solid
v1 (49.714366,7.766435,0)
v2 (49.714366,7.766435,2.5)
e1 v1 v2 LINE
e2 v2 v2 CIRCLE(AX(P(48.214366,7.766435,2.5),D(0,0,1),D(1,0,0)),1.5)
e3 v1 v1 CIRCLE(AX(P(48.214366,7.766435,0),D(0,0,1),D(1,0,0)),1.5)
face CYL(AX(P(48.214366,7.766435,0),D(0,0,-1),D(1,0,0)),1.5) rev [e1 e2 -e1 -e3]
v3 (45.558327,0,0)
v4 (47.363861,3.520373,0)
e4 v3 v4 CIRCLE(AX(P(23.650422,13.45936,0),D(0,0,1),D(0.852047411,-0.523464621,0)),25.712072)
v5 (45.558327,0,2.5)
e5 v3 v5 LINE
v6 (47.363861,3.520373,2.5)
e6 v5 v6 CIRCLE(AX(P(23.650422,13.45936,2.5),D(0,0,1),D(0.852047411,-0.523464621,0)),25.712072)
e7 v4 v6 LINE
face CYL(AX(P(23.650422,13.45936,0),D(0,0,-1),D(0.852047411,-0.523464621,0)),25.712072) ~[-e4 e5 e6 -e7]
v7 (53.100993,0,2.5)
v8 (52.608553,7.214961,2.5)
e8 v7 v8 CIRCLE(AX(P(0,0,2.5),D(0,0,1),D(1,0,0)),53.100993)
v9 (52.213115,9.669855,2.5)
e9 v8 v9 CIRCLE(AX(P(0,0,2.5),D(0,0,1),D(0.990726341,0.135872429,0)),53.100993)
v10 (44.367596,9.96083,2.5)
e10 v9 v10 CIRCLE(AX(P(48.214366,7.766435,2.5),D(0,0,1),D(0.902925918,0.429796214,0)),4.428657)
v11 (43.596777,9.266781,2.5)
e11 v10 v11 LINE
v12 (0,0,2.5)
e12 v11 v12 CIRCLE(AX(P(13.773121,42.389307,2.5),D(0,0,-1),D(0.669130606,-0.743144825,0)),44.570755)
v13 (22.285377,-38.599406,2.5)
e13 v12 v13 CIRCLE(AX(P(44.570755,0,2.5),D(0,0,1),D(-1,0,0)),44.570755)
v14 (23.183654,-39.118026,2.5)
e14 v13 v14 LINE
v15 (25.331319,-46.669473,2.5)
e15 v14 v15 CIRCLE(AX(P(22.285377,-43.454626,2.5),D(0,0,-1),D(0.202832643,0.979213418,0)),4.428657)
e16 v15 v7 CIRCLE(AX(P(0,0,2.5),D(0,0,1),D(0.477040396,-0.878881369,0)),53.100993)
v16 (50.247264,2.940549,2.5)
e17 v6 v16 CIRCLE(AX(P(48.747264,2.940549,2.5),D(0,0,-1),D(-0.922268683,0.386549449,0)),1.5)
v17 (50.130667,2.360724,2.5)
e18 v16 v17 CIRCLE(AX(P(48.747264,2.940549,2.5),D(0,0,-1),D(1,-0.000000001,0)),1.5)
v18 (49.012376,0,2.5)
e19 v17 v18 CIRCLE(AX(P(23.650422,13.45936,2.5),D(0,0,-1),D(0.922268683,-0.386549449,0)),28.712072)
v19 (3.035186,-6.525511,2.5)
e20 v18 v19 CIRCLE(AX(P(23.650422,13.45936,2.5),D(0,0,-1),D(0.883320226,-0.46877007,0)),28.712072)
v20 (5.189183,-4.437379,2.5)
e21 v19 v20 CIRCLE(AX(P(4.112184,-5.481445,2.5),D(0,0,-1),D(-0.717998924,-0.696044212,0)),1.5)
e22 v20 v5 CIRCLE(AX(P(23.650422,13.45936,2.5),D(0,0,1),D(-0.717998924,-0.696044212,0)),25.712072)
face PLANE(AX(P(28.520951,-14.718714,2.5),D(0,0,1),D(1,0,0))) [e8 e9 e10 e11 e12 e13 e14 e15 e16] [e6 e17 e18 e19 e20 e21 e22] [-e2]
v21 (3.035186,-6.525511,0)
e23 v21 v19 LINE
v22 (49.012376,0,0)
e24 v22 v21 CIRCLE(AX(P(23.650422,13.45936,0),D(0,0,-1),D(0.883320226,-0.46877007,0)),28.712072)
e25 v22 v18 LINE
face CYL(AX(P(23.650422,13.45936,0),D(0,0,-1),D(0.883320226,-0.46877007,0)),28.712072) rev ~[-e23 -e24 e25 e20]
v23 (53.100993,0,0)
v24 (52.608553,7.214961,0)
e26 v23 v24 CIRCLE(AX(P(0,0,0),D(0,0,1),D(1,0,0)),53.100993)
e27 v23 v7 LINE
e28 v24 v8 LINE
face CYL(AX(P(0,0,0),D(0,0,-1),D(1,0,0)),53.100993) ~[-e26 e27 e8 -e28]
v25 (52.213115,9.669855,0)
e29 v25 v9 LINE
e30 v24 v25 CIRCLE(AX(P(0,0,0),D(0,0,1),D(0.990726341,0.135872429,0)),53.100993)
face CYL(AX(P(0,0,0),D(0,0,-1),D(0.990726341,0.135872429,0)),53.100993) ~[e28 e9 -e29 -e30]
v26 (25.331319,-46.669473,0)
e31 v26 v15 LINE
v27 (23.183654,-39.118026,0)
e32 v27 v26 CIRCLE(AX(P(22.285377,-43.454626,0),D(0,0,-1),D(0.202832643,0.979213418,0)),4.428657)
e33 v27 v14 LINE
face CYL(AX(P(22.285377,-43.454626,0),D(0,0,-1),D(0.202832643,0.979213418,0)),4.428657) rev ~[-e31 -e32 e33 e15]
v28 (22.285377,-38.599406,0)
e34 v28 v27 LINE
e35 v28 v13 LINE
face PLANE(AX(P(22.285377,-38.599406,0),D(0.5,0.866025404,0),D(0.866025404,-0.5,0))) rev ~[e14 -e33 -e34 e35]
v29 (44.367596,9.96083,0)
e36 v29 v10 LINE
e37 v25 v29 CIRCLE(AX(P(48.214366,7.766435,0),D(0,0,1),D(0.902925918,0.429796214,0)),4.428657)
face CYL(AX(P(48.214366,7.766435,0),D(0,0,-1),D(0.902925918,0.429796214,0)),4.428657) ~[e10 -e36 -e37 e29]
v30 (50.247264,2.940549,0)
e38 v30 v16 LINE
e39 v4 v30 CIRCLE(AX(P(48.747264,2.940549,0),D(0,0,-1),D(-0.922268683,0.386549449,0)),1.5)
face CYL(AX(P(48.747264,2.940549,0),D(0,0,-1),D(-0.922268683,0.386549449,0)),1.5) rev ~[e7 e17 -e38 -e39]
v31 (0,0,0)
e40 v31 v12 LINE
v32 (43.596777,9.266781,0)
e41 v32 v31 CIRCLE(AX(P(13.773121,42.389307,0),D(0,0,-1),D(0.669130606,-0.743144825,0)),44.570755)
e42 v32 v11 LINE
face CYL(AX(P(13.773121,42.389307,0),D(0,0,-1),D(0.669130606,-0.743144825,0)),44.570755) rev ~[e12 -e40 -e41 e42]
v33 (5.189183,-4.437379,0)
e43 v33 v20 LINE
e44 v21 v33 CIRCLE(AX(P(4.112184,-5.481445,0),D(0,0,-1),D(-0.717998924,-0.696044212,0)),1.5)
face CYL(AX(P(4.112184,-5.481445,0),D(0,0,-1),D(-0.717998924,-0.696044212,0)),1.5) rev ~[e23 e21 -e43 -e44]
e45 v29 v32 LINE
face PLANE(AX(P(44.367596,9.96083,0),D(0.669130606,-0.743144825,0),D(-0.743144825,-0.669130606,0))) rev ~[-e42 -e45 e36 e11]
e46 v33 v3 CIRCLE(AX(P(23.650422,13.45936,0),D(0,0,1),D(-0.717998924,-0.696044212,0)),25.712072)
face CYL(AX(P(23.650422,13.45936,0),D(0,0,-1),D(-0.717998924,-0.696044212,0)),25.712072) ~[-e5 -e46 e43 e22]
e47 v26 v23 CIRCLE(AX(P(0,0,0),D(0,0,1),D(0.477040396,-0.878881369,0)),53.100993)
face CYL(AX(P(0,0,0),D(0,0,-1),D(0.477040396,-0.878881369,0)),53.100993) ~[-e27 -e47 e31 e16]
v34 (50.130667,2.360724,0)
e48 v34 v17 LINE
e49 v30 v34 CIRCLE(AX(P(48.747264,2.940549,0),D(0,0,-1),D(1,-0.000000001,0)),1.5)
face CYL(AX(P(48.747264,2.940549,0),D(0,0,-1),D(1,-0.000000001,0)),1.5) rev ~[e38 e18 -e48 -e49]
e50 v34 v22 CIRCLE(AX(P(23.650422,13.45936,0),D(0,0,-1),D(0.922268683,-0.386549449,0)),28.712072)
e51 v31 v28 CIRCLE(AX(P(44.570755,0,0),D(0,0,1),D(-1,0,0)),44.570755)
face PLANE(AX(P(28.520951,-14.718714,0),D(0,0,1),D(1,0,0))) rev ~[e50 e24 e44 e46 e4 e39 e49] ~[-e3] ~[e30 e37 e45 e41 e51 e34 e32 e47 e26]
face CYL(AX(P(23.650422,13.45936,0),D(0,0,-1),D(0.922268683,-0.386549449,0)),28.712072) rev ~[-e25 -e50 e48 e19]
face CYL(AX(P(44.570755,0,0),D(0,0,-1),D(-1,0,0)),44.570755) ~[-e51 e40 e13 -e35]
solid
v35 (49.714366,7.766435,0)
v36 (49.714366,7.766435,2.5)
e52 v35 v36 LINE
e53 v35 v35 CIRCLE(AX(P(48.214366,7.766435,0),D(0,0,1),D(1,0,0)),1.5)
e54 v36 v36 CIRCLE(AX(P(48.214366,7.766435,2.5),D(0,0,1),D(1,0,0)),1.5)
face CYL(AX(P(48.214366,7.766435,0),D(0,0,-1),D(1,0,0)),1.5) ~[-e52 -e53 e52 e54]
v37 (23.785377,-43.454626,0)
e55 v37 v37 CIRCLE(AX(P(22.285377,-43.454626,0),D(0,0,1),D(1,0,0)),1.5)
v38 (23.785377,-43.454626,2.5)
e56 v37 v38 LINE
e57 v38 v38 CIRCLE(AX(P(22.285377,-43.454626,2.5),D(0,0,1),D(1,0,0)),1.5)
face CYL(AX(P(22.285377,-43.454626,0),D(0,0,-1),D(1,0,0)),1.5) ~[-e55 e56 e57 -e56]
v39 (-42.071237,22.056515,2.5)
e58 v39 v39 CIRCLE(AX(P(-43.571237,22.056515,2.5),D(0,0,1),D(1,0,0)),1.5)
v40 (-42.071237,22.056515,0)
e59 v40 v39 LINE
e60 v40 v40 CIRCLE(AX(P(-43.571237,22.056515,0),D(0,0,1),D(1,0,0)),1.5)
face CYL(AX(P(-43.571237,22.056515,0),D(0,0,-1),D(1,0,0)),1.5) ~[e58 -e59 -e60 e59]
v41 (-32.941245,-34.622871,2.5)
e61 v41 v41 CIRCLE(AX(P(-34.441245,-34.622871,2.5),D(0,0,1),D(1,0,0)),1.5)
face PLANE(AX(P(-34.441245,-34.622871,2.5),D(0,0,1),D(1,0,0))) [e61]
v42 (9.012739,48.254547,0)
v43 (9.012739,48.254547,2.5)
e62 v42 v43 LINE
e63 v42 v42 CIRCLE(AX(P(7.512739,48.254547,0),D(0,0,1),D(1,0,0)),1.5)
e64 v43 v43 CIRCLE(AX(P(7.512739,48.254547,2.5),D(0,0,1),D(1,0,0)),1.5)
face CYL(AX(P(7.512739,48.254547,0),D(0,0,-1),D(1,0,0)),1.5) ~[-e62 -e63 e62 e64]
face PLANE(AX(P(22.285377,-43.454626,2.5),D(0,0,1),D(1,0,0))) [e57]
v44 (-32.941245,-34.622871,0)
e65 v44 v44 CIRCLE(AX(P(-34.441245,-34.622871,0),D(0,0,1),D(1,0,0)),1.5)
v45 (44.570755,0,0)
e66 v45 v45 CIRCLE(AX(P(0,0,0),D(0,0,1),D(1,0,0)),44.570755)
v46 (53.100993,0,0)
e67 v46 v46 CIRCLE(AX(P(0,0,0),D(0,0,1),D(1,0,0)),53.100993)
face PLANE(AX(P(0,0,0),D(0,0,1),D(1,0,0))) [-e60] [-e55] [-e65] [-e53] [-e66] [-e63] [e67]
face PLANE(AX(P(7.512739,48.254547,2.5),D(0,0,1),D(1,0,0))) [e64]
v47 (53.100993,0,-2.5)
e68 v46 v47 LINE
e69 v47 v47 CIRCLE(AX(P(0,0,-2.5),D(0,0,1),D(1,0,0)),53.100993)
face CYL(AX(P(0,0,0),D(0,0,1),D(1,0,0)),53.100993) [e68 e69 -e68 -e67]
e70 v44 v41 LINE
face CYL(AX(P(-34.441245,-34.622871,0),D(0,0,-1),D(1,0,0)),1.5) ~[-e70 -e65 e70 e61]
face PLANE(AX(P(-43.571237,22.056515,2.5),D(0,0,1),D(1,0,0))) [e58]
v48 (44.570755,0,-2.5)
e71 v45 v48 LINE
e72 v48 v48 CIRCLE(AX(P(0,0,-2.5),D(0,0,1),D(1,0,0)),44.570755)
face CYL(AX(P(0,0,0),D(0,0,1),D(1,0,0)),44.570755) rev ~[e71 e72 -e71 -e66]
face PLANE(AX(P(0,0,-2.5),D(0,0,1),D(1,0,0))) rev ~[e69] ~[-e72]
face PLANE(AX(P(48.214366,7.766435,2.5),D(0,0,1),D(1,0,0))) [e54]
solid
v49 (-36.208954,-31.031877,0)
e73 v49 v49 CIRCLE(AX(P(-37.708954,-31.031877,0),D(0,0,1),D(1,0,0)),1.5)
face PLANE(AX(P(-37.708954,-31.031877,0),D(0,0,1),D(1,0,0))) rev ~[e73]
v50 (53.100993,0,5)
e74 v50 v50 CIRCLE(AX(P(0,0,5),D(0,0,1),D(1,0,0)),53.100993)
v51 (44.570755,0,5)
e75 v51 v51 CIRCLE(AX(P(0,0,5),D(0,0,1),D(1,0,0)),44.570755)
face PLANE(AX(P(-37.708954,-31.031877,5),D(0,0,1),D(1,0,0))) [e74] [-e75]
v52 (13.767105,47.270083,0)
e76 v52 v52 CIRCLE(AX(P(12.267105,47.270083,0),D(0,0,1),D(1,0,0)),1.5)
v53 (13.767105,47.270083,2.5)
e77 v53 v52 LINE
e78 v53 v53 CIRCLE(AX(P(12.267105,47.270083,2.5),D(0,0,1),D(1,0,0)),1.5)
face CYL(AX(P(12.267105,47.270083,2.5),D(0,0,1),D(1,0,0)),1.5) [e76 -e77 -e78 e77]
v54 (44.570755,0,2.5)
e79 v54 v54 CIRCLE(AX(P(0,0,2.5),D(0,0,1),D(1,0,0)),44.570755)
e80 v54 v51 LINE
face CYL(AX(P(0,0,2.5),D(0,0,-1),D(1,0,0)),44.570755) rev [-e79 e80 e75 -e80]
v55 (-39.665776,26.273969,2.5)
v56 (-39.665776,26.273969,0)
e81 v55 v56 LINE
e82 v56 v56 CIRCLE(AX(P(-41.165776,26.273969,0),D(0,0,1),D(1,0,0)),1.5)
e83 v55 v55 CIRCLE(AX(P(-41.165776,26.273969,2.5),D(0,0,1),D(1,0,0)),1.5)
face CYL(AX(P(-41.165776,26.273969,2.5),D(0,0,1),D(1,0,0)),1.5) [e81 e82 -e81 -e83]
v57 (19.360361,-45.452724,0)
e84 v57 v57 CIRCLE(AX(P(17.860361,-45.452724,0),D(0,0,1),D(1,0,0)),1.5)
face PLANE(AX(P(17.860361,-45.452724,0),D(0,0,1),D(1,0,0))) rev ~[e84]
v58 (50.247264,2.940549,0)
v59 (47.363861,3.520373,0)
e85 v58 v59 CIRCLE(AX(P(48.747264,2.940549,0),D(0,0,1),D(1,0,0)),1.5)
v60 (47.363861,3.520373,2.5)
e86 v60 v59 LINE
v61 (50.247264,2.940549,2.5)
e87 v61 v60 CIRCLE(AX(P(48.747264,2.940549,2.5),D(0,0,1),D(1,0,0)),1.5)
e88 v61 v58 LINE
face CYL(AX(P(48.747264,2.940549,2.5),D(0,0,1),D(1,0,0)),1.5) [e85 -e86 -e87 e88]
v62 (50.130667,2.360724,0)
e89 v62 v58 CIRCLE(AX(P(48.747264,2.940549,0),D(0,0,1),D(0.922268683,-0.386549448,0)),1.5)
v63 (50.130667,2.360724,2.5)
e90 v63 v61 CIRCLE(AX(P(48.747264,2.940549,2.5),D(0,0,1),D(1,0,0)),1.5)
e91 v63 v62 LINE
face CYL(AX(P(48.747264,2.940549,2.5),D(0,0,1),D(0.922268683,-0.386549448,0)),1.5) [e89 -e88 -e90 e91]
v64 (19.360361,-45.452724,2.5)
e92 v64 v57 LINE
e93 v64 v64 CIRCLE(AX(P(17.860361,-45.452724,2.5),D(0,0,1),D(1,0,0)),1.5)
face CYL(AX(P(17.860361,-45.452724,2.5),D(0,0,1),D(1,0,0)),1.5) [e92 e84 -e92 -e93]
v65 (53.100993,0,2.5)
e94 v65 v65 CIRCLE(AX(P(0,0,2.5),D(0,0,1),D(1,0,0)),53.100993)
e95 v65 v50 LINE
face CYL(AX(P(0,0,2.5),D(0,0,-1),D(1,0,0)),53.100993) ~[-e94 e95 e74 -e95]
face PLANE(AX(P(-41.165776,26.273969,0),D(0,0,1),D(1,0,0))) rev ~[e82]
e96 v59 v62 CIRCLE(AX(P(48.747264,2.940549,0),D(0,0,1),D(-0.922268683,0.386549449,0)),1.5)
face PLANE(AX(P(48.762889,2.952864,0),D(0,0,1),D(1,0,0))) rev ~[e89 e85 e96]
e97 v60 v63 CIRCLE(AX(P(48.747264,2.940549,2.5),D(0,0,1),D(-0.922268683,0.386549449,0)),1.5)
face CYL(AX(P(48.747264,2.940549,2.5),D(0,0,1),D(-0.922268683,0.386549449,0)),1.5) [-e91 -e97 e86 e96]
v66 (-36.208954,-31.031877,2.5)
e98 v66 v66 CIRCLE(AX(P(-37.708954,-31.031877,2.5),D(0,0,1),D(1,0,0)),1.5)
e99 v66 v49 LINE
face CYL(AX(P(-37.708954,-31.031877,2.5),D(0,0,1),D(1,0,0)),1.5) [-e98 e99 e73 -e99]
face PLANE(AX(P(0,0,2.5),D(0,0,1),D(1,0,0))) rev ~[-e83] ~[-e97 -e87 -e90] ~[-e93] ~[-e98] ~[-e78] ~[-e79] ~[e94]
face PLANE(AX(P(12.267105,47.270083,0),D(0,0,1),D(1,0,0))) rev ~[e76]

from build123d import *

# Parameters (mm, degrees)
F1_R          = 1.5
F2_DEPTH      = 2.5
F3_R          = 53.1009930313
F3_R_2        = 1.5
F3_R_3        = 44.5707546786
F4_DEPTH      = 2.5
F5_DEPTH      = 2.5
F6_R          = 53.1009930313
F6_R_2        = 1.5
F6_R_3        = 44.5707546786
F7_DEPTH      = 2.5
F8_DEPTH      = 2.5
F8_DEPTH_BACK = 2.5


with BuildPart() as f2:
    # F1 (on Top) → F2 (new body)
    with BuildSketch(Plane.XY):
        with BuildLine():
            ThreePointArc((43.5967767518, 9.2667809662), (23.0399016141, -1.2074700785), (0, 0))
            ThreePointArc((0, 0), (5.9713488611, -22.2853773393), (22.2853773393, -38.5994058175))
            Line((22.2853773393, -38.5994058175), (23.1836535337, -39.1180258202))
            ThreePointArc((23.1836535337, -39.1180258202), (26.5451077793, -42.2431398769), (25.3313187663, -46.6694734325))
            ThreePointArc((25.3313187663, -46.6694734325), (45.6335054658, -27.1532436334), (53.1009930313, 0))
            ThreePointArc((53.1009930313, 0), (52.977739866, 3.6158732827), (52.6085525382, 7.2149608971))
            ThreePointArc((52.6085525382, 7.2149608971), (52.4252049406, 8.4447230767), (52.2131148088, 9.6698553699))
            ThreePointArc((52.2131148088, 9.6698553699), (48.3785028701, 12.1920496116), (44.3675962945, 9.96083))
            Line((44.3675962945, 9.96083), (43.5967767518, 9.2667809662))
        make_face()
        with BuildLine():
            ThreePointArc((50.1306670439, 2.3607243834), (49.5983825966, 1.1676379558), (49.0123761454, 0))
            ThreePointArc((49.0123761454, 0), (27.6850730752, -14.9678218042), (3.035185807, -6.5255114881))
            ThreePointArc((3.035185807, -6.5255114881), (3.0681178737, -4.404446784), (5.1891825778, -4.4373788507))
            ThreePointArc((5.1891825778, -4.4373788507), (26.4597740482, -12.0987734107), (45.5583266127, 0))
            ThreePointArc((45.5583266127, 0), (46.5289054338, 1.7254070276), (47.3638609946, 3.5203727292))
            ThreePointArc((47.3638609946, 3.5203727292), (49.0429796454, 4.411110445), (50.2472640193, 2.9405485563))
            ThreePointArc((50.2472640193, 2.9405485563), (50.2178259079, 2.6448329302), (50.1306670439, 2.3607243834))
        make_face(mode=Mode.SUBTRACT)
        with Locations((48.2143656672, 7.7664353785)):
            Circle(F1_R, mode=Mode.SUBTRACT)
    extrude(amount=F2_DEPTH)


with BuildPart() as f4:
    # F3 (on Top) → F4 (new body)
    with BuildSketch(Plane.XY):
        Circle(F3_R)
        with Locations((-34.4412450194, -34.6228712947)):
            Circle(F3_R_2, mode=Mode.SUBTRACT)
        with Locations((22.2853773393, -43.4546261291)):
            Circle(F3_R_2, mode=Mode.SUBTRACT)
        with Locations((-43.5712373761, 22.0565148808)):
            Circle(F3_R_2, mode=Mode.SUBTRACT)
        Circle(F3_R_3, mode=Mode.SUBTRACT)
        with Locations((48.2143656672, 7.7664353785)):
            Circle(F3_R_2, mode=Mode.SUBTRACT)
        with Locations((7.512739389, 48.2545471645)):
            Circle(F3_R_2, mode=Mode.SUBTRACT)
        with Locations((22.2853773393, -43.4546261291)):
            Circle(F3_R_2)
        with Locations((48.2143656672, 7.7664353785)):
            Circle(F3_R_2)
        with Locations((7.512739389, 48.2545471645)):
            Circle(F3_R_2)
        with Locations((-43.5712373761, 22.0565148808)):
            Circle(F3_R_2)
        with Locations((-34.4412450194, -34.6228712947)):
            Circle(F3_R_2)
    extrude(amount=-F4_DEPTH)

    # F3 (on Top) → F5 (join)
    with BuildSketch(Plane.XY):
        with Locations((7.512739389, 48.2545471645)):
            Circle(F3_R_2)
        with Locations((-43.5712373761, 22.0565148808)):
            Circle(F3_R_2)
        with Locations((-34.4412450194, -34.6228712947)):
            Circle(F3_R_2)
        with Locations((22.2853773393, -43.4546261291)):
            Circle(F3_R_2)
        with Locations((48.2143656672, 7.7664353785)):
            Circle(F3_R_2)
    extrude(amount=F5_DEPTH)


with BuildPart() as f7:
    # F6 (on face) → F7 (new body)
    with BuildSketch(Plane.XY.offset(2.5)):
        Circle(F6_R)
        with Locations((-37.7089539458, -31.031876635)):
            Circle(F6_R_2, mode=Mode.SUBTRACT)
        with Locations((17.8603608772, -45.4527236204)):
            Circle(F6_R_2, mode=Mode.SUBTRACT)
        with Locations((-41.1657760959, 26.2739691253)):
            Circle(F6_R_2, mode=Mode.SUBTRACT)
        Circle(F6_R_3, mode=Mode.SUBTRACT)
        with Locations((48.7472640193, 2.9405485563)):
            Circle(F6_R_2, mode=Mode.SUBTRACT)
        with Locations((12.2671051452, 47.2700825738)):
            Circle(F6_R_2, mode=Mode.SUBTRACT)
    extrude(amount=F7_DEPTH)

    # F6 (on face) → F8 (join, two sides)
    with BuildSketch(Plane.XY.offset(2.5)) as f8_sk:
        with Locations((-37.7089539458, -31.031876635)):
            Circle(F6_R_2)
        with Locations((-41.1657760959, 26.2739691253)):
            Circle(F6_R_2)
        with Locations((12.2671051452, 47.2700825738)):
            Circle(F6_R_2)
        with BuildLine():
            ThreePointArc((50.1306670439, 2.3607243834), (50.2178259079, 2.6448329302), (50.2472640193, 2.9405485563))
            ThreePointArc((50.2472640193, 2.9405485563), (49.0429796454, 4.411110445), (47.3638609946, 3.5203727292))
            ThreePointArc((47.3638609946, 3.5203727292), (48.1674398464, 1.5571455317), (50.1306670439, 2.3607243834))
        make_face()
        with Locations((17.8603608772, -45.4527236204)):
            Circle(F6_R_2)
    extrude(amount=-F8_DEPTH)
    extrude(f8_sk.sketch, amount=F8_DEPTH_BACK)


solid = Compound([f2.part, f4.part, f7.part])
